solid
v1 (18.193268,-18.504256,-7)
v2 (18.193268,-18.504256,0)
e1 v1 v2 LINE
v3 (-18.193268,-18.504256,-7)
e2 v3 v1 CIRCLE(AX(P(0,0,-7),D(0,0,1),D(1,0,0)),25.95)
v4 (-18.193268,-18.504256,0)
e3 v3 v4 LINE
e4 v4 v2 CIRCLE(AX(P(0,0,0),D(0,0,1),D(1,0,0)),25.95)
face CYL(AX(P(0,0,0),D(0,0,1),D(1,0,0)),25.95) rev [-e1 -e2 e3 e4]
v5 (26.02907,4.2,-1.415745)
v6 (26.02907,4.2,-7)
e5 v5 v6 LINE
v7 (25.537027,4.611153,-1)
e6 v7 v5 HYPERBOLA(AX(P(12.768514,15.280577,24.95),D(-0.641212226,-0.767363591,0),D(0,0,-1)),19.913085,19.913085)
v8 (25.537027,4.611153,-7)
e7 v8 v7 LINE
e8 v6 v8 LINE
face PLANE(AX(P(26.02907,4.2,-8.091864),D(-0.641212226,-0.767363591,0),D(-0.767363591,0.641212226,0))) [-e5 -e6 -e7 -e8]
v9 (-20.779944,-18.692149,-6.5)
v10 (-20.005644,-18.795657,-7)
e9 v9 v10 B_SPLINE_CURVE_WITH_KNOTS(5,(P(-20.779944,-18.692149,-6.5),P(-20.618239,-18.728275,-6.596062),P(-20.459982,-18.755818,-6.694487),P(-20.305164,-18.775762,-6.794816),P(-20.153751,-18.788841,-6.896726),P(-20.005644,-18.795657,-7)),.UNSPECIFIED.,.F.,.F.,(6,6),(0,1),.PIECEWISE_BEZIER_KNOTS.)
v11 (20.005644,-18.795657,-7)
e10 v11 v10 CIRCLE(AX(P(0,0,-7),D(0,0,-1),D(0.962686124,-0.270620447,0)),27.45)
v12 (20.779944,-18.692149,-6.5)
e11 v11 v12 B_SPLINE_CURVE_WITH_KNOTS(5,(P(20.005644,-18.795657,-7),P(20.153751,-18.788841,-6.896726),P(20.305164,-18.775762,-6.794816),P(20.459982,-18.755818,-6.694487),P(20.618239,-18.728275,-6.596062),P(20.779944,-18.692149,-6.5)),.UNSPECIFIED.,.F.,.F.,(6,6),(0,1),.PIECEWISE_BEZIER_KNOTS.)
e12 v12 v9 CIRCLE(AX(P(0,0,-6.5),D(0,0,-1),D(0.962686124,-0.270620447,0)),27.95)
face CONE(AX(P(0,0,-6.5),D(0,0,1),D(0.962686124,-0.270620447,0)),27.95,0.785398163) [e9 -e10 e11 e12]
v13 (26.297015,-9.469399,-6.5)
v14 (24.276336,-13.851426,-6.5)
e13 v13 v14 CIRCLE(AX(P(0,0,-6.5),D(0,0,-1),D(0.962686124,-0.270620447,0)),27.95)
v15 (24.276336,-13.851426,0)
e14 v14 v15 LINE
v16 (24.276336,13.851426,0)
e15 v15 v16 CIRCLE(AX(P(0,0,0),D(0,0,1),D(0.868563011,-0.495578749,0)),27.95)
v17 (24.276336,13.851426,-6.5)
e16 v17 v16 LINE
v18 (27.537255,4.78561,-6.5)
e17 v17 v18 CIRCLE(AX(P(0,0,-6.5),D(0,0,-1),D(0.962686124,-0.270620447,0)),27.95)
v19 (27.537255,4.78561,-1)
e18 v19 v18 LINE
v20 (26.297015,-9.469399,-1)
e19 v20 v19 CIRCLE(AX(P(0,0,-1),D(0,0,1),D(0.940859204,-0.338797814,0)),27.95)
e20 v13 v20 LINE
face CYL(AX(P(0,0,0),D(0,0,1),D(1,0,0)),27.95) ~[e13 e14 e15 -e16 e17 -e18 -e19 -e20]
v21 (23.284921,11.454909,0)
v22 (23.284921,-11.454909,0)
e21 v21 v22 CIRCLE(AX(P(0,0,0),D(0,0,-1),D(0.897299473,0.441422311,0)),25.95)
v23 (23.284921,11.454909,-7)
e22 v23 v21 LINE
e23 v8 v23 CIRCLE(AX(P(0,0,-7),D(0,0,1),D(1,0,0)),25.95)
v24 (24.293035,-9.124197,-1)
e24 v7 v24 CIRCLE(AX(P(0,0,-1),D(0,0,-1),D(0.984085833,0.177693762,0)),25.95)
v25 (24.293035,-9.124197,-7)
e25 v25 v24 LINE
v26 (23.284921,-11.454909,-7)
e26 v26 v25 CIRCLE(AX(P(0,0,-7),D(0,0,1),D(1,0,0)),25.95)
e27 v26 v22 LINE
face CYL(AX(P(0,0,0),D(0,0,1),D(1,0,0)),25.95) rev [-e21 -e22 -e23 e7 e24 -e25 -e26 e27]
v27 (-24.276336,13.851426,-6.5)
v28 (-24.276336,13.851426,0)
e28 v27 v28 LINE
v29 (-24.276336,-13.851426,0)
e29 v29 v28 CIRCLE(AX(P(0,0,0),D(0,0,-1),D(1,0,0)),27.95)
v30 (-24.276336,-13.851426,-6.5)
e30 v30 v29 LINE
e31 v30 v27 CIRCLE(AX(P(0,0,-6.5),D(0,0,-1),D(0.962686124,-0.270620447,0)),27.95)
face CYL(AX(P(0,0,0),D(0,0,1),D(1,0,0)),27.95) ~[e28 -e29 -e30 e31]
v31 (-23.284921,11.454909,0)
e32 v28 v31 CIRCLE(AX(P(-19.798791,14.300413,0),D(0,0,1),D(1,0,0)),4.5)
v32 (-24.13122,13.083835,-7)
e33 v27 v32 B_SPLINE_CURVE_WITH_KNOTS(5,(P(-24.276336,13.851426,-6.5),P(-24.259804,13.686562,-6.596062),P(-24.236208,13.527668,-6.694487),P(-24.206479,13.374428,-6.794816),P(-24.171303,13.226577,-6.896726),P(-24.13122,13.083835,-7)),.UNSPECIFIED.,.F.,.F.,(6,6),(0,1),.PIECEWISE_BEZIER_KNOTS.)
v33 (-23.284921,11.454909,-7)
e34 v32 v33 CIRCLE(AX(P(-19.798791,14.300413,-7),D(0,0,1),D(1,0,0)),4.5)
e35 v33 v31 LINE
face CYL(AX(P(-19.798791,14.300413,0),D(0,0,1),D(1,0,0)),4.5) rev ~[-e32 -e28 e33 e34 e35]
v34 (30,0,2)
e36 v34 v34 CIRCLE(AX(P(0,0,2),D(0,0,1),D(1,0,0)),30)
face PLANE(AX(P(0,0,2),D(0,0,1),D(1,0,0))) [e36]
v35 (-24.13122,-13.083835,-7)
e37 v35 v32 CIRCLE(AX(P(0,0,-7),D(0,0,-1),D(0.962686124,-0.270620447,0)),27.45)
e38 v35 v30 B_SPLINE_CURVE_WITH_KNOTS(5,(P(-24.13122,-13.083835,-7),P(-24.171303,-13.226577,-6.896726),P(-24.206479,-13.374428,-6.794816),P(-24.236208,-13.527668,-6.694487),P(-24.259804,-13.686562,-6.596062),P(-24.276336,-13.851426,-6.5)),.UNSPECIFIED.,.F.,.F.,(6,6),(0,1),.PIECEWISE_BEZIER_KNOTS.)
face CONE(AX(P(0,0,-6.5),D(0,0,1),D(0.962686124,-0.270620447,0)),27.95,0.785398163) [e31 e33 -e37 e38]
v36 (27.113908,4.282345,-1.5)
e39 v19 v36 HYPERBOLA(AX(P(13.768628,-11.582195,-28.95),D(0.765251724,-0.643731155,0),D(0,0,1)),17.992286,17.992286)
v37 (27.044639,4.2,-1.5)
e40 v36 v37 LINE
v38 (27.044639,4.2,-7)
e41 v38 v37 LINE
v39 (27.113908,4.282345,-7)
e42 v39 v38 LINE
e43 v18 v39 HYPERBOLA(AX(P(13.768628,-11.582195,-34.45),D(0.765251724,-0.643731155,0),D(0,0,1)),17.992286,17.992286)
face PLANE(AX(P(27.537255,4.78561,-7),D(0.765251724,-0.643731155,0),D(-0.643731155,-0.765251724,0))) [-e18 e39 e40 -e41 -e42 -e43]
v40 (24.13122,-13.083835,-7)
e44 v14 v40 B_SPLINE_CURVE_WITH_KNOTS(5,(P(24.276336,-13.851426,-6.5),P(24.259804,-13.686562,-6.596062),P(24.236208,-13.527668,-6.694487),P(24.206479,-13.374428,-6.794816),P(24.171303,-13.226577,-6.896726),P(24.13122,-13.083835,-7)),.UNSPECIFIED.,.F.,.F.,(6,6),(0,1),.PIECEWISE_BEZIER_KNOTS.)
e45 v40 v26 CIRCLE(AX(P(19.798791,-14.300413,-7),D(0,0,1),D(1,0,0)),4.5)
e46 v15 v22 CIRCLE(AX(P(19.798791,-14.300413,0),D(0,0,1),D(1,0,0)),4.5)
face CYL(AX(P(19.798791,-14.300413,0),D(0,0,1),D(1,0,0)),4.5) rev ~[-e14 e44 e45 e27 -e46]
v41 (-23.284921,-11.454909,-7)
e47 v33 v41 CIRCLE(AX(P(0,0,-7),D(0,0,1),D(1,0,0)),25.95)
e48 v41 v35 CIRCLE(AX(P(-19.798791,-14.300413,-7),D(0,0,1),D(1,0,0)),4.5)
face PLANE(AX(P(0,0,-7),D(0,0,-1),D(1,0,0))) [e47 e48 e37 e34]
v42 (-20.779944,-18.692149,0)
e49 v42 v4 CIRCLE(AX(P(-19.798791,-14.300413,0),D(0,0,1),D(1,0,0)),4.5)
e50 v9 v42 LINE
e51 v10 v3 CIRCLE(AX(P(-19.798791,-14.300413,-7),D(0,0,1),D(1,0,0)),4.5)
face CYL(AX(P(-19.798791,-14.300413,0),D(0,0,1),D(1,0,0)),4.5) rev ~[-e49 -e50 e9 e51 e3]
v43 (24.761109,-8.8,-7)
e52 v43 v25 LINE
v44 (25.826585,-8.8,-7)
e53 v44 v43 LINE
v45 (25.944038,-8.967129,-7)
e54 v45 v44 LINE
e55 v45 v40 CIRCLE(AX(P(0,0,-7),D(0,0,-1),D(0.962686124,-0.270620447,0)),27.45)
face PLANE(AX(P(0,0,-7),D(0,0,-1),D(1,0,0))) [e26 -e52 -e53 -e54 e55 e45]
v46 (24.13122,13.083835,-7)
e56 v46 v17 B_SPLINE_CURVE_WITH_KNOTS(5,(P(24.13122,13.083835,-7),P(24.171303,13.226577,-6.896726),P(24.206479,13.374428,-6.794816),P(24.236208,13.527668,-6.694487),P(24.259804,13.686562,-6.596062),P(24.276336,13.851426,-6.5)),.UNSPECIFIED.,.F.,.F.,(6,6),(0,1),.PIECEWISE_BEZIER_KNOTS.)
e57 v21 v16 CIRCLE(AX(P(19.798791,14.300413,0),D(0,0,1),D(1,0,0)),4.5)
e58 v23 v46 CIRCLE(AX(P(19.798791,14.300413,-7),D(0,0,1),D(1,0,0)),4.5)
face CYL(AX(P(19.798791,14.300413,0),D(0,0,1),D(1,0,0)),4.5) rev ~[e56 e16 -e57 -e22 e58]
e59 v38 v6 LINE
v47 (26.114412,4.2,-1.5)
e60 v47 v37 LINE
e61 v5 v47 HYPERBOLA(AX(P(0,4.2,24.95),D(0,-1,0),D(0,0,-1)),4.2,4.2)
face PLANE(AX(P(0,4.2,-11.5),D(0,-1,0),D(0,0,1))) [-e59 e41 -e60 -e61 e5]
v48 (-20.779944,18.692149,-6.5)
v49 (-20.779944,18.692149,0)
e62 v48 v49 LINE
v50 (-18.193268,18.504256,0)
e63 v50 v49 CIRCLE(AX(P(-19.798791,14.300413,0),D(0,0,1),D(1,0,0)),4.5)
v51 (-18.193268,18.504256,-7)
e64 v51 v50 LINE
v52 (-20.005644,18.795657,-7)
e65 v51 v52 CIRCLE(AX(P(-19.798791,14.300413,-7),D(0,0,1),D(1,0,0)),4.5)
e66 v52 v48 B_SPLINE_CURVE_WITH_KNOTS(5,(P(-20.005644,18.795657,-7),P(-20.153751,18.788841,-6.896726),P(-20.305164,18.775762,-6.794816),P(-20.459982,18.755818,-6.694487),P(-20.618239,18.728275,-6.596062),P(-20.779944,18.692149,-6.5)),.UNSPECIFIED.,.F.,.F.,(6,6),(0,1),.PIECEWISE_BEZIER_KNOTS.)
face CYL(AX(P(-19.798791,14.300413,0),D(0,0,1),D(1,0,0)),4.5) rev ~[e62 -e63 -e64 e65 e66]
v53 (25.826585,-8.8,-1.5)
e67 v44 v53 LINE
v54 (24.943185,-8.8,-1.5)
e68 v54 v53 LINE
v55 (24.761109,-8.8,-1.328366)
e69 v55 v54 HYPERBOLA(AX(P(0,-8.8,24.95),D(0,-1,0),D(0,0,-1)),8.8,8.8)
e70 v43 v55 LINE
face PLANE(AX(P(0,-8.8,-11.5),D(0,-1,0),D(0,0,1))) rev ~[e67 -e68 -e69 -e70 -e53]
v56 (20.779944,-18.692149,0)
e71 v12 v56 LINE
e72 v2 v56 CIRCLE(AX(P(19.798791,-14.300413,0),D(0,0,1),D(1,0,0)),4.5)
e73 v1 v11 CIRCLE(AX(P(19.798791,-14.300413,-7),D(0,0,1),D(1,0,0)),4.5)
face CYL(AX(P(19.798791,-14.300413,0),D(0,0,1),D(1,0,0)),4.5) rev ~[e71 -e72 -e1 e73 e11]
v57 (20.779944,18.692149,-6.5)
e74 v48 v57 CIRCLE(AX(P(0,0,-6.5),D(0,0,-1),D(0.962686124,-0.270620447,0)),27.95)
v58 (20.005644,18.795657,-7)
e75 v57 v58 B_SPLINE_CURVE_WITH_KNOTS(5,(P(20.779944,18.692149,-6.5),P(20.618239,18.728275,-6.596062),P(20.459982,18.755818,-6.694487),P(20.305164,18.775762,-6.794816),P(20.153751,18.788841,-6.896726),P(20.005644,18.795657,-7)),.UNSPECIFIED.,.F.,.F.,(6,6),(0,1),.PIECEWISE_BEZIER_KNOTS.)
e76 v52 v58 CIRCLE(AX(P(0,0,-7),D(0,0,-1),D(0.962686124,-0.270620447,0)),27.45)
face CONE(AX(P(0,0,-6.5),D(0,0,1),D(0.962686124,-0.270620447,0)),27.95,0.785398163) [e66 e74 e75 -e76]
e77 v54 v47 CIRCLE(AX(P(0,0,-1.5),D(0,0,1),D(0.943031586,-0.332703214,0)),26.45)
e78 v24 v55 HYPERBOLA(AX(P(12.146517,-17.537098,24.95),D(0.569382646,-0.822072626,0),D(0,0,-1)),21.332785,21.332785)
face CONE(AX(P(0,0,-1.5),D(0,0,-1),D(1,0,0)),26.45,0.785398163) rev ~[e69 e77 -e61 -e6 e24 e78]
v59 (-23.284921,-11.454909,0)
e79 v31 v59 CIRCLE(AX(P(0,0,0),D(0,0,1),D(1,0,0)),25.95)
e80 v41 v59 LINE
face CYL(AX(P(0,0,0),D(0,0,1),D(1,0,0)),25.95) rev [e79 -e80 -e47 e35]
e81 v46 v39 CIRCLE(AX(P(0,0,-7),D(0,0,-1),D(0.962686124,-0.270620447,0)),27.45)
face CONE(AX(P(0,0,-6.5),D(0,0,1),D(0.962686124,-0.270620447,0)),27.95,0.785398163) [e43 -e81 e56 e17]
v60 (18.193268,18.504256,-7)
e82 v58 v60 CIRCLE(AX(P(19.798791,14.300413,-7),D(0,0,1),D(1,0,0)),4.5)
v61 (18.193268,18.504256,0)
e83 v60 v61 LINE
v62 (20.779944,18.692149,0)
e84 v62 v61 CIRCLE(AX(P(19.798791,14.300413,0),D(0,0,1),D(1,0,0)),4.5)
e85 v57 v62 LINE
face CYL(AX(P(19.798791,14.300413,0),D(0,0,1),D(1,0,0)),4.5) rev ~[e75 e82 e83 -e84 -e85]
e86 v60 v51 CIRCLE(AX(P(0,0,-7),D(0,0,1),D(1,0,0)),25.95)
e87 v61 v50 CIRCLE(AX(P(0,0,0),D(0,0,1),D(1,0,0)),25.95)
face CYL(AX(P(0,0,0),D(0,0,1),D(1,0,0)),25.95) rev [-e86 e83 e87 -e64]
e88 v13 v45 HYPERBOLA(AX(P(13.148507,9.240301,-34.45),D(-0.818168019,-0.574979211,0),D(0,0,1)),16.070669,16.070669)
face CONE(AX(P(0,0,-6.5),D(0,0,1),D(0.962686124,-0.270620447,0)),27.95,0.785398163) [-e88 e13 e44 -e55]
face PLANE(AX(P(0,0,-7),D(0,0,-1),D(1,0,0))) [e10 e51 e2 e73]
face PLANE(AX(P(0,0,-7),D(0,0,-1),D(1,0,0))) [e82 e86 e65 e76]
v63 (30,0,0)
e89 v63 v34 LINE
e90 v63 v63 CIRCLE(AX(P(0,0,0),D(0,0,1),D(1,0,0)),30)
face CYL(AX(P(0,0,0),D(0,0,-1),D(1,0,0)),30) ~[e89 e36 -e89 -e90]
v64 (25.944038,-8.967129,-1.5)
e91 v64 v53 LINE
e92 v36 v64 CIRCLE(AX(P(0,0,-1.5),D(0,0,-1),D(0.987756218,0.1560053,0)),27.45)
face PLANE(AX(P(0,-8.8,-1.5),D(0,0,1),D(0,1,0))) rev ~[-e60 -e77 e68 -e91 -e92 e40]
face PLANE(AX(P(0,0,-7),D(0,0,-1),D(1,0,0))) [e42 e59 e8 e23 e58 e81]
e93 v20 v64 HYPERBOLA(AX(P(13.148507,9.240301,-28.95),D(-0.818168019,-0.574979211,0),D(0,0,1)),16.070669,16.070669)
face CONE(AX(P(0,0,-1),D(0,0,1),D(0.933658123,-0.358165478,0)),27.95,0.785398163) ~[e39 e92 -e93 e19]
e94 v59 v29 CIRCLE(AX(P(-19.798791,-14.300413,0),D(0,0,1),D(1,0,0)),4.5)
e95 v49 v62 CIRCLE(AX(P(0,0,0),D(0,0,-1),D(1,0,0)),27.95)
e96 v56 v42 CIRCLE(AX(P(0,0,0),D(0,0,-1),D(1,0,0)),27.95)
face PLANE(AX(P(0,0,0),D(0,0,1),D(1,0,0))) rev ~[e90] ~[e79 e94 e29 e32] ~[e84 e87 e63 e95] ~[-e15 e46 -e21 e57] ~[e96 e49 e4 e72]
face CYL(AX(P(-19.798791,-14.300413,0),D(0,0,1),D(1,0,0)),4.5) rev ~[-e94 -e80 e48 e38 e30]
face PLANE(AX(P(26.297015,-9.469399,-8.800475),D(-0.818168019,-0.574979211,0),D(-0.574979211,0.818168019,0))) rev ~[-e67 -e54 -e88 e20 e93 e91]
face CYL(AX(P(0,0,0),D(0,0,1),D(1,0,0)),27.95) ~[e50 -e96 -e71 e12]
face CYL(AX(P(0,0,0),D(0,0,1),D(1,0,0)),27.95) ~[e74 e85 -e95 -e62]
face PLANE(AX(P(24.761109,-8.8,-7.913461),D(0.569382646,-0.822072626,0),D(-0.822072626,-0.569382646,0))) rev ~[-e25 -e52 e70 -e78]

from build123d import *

# Parameters (mm, degrees)
F0_R         = 30
F1_DEPTH     = 2
F2_R         = 27.95
F3_DEPTH     = 7
F4_T         = -2
F5_W         = 13
F5_H         = 10
F6_DEPTH     = 30
F7_T1_DEPTH  = 7.3004746493
F7_T3_DEPTH  = 6.5918643954
F7_T5_DEPTH  = 6.4134609486
F7_T7_DEPTH  = 7.0163816712
F7_T12_ANGLE = 11.2783830284
F7_T17_ANGLE = 20.9875744089
F7_T22_ANGLE = 22.6619870068
F7_T27_ANGLE = 12.1533364168
F7_T30_ANGLE = 338.3067764097
F7_T35_ANGLE = 11.2783830284
F7_T39_DEPTH = 7.0163816712
F7_T47_DEPTH = 7.3004746493
F7_T52_ANGLE = 20.9875744089
F7_T59_ANGLE = 22.6619870068
F7_T63_DEPTH = 6.4134609486
F7_T70_ANGLE = 12.1533364168
F7_T74_DEPTH = 6.5918643954
F8_R         = 4.5
F9_DEPTH     = 25


# Not quite as in the source:
# - a fillet or chamfer that OpenCascade refuses, or shapes differently, is made with other operations: its cross-section is extruded or revolved along the edge and cut away or added


with BuildPart() as f1:
    # F0 (on Top) → F1 (new body)
    with BuildSketch(Plane.XY):
        Circle(F0_R)
    extrude(amount=F1_DEPTH)

    # F2 (on face) → F3 (join)
    with BuildSketch(Plane(origin=(0, 0, 0), x_dir=(1, 0, 0), z_dir=(0, 0, -1))):
        Circle(F2_R)
    extrude(amount=F3_DEPTH)

    # F4
    f4_openings = [f1.faces().sort_by_distance(p)[0] for p in [
        (0, 0, -7),
    ]]
    offset(amount=F4_T, openings=f4_openings, kind=Kind.INTERSECTION)

    # F5 (on Right) → F6 (cut)
    with BuildSketch(Plane.YZ):
        with Locations((-2.3, -6.5)):
            Rectangle(F5_W, F5_H)
    extrude(amount=F6_DEPTH, mode=Mode.SUBTRACT)

    # F7: chamfer of 0.5 on 9 edges, made by hand

    # F7_s2 → F7_t1 (cut)
    with BuildSketch(Plane.XY.offset(-8.8004746493)):
        with BuildLine():
            Line((26.2970147419, -9.4693989071), (25.8265851401, -8.8))
            Line((25.8265851401, -8.8), (26.5285223863, -8.8))
            ThreePointArc((26.5285223863, -8.8), (26.4129758895, -9.1409630052), (26.2970147419, -9.4693989071))
        make_face()
    extrude(amount=F7_T1_DEPTH, mode=Mode.SUBTRACT)

    # F7_s4 → F7_t3 (cut)
    with BuildSketch(Plane.XY.offset(-8.0918643954)):
        with BuildLine():
            Line((26.0290702869, 4.2), (25.5370273703, 4.6111531191))
            ThreePointArc((25.5370273703, 4.6111531191), (25.5719745626, 4.4132320321), (25.6078601215, 4.2))
            Line((25.6078601215, 4.2), (26.0290702869, 4.2))
        make_face()
    extrude(amount=F7_T3_DEPTH, mode=Mode.SUBTRACT)

    # F7_s6 → F7_t5 (cut)
    with BuildSketch(Plane.XY.offset(-7.9134609486)):
        with BuildLine():
            Line((24.7611086182, -8.8), (24.2930347312, -9.1241965974))
            ThreePointArc((24.2930347312, -9.1241965974), (24.3504005172, -8.9699774052), (24.4123431895, -8.8))
            Line((24.4123431895, -8.8), (24.7611086182, -8.8))
        make_face()
    extrude(amount=F7_T5_DEPTH, mode=Mode.SUBTRACT)

    # F7_s8 → F7_t7 (cut)
    with BuildSketch(Plane.XY.offset(-8.5163816712)):
        with BuildLine():
            Line((27.5372554008, 4.7856102004), (27.0446390251, 4.2))
            Line((27.0446390251, 4.2), (27.6326346916, 4.2))
            ThreePointArc((27.6326346916, 4.2), (27.585450674, 4.4994900946), (27.5372554008, 4.7856102004))
        make_face()
    extrude(amount=F7_T7_DEPTH, mode=Mode.SUBTRACT)


with BuildPart() as f7_tool10:
    # F7_s11 → F7_t12 (revolve)
    with BuildSketch(Plane.XZ):
        Polygon((27.95, -1), (27.45, -1.5), (27.95, -1.5), align=None)
    revolve(axis=Axis((0, 0, -1.5), (0, 0, 1)), revolution_arc=F7_T12_ANGLE)

    split(bisect_by=Plane.XZ.offset(-4.2), keep=Keep.TOP)


with BuildPart() as f1_1:
    add(f1.part)

    # F7_t9: cut F7_tool10
    add(f7_tool10.part, mode=Mode.SUBTRACT)


with BuildPart() as f7_tool15:
    # F7_s16 → F7_t17 (revolve)
    with BuildSketch(Plane(origin=(0, 0, 0), x_dir=(0, 0, 1), z_dir=(-0.3581654779, -0.9336581229, 0))):
        Polygon((-1, -27.95), (-1.5, -27.45), (-1.5, -27.95), align=None)
    revolve(axis=Axis((0, 0, -1.5), (0, 0, 1)), revolution_arc=F7_T17_ANGLE)

    split(bisect_by=Plane.XZ.offset(8.8), keep=Keep.BOTTOM)


with BuildPart() as f1_2:
    add(f1_1.part)

    # F7_t14: cut F7_tool15
    add(f7_tool15.part, mode=Mode.SUBTRACT)


with BuildPart() as f7_tool20:
    # F7_s21 → F7_t22 (revolve)
    with BuildSketch(Plane(origin=(0, 0, 0), x_dir=(0, 0, 1), z_dir=(-0.3852938978, -0.9227939165, 0))):
        Polygon((-1.5, -26.45), (-1, -25.95), (-1.5, -25.95), align=None)
    revolve(axis=Axis((0, 0, -1.5), (0, 0, 1)), revolution_arc=F7_T22_ANGLE)

    split(bisect_by=Plane.XZ.offset(8.8), keep=Keep.BOTTOM)


with BuildPart() as f1_3:
    add(f1_2.part)

    # F7_t19: cut F7_tool20
    add(f7_tool20.part, mode=Mode.SUBTRACT)


with BuildPart() as f7_tool25:
    # F7_s26 → F7_t27 (revolve)
    with BuildSketch(Plane.XZ):
        Polygon((26.45, -1.5), (25.95, -1), (25.95, -1.5), align=None)
    revolve(axis=Axis((0, 0, -1.5), (0, 0, 1)), revolution_arc=F7_T27_ANGLE)

    split(bisect_by=Plane.XZ.offset(-4.2), keep=Keep.TOP)


with BuildPart() as f1_4:
    add(f1_3.part)

    # F7_t24: cut F7_tool25
    add(f7_tool25.part, mode=Mode.SUBTRACT)

    # F7_s29 → F7_t30 (revolve, cut)
    with BuildSketch(Plane(origin=(0, 0, 0), x_dir=(0, 0, 1), z_dir=(0.2706204465, 0.9626861243, 0))):
        Polygon((-6.5, 27.95), (-7, 27.45), (-7, 27.95), align=None)
    revolve(axis=Axis((0, 0, -7), (0, 0, -1)), revolution_arc=F7_T30_ANGLE, mode=Mode.SUBTRACT)


with BuildPart() as f7_tool33:
    # F7_s34 → F7_t35 (revolve)
    with BuildSketch(Plane.XZ):
        Polygon((27.95, -1), (27.45, -1.5), (27.95, -1.5), align=None)
    revolve(axis=Axis((0, 0, -1.5), (0, 0, 1)), revolution_arc=F7_T35_ANGLE)

    split(bisect_by=Plane.XZ.offset(-4.2), keep=Keep.BOTTOM)


with BuildPart() as f7_tool37:
    # F7_s38 → F7_t39 (new body)
    with BuildSketch(Plane.XY.offset(-7)):
        with BuildLine():
            Line((27.5372554008, 4.7856102004), (27.0446390251, 4.2))
            Line((27.0446390251, 4.2), (27.6326346916, 4.2))
            ThreePointArc((27.6326346916, 4.2), (27.585450674, 4.4994900946), (27.5372554008, 4.7856102004))
        make_face()
    extrude(amount=F7_T39_DEPTH)

    split(bisect_by=Plane.XY, keep=Keep.BOTTOM)

    split(bisect_by=Plane.XY.offset(-1.5), keep=Keep.TOP)


with BuildPart() as f7_tool33_1:
    add(f7_tool33.part)

    # F7_t42: intersect F7_tool37
    add(f7_tool37.part, mode=Mode.INTERSECT)


with BuildPart() as f1_5:
    add(f1_4.part)

    # F7_t31: cut F7_tool33
    add(f7_tool33_1.part, mode=Mode.SUBTRACT)


with BuildPart() as f7_tool45:
    # F7_s46 → F7_t47 (new body)
    with BuildSketch(Plane.XY.offset(-7)):
        with BuildLine():
            Line((26.2970147419, -9.4693989071), (25.8265851401, -8.8))
            Line((25.8265851401, -8.8), (26.5285223863, -8.8))
            ThreePointArc((26.5285223863, -8.8), (26.4129758895, -9.1409630052), (26.2970147419, -9.4693989071))
        make_face()
    extrude(amount=F7_T47_DEPTH)

    split(bisect_by=Plane.XY, keep=Keep.BOTTOM)

    split(bisect_by=Plane.XY.offset(-1.5), keep=Keep.TOP)


with BuildPart() as f7_tool50:
    # F7_s51 → F7_t52 (revolve)
    with BuildSketch(Plane(origin=(0, 0, 0), x_dir=(0, 0, 1), z_dir=(-0.3581654779, -0.9336581229, 0))):
        Polygon((-1, -27.95), (-1.5, -27.45), (-1.5, -27.95), align=None)
    revolve(axis=Axis((0, 0, -1.5), (0, 0, 1)), revolution_arc=F7_T52_ANGLE)

    split(bisect_by=Plane.XZ.offset(8.8), keep=Keep.TOP)


with BuildPart() as f7_tool45_1:
    add(f7_tool45.part)

    # F7_t54: intersect F7_tool50
    add(f7_tool50.part, mode=Mode.INTERSECT)


with BuildPart() as f1_6:
    add(f1_5.part)

    # F7_t43: cut F7_tool45
    add(f7_tool45_1.part, mode=Mode.SUBTRACT)


with BuildPart() as f7_tool57:
    # F7_s58 → F7_t59 (revolve)
    with BuildSketch(Plane(origin=(0, 0, 0), x_dir=(0, 0, 1), z_dir=(-0.3852938978, -0.9227939165, 0))):
        Polygon((-1.5, -26.45), (-1, -25.95), (-1.5, -25.95), align=None)
    revolve(axis=Axis((0, 0, -1.5), (0, 0, 1)), revolution_arc=F7_T59_ANGLE)

    split(bisect_by=Plane.XZ.offset(8.8), keep=Keep.TOP)


with BuildPart() as f7_tool61:
    # F7_s62 → F7_t63 (new body)
    with BuildSketch(Plane.XY.offset(-7)):
        with BuildLine():
            Line((24.7611086182, -8.8), (24.2930347312, -9.1241965974))
            ThreePointArc((24.2930347312, -9.1241965974), (24.3504005172, -8.9699774052), (24.4123431895, -8.8))
            Line((24.4123431895, -8.8), (24.7611086182, -8.8))
        make_face()
    extrude(amount=F7_T63_DEPTH)

    split(bisect_by=Plane.XY.offset(-1.5), keep=Keep.TOP)


with BuildPart() as f7_tool57_1:
    add(f7_tool57.part)

    # F7_t65: intersect F7_tool61
    add(f7_tool61.part, mode=Mode.INTERSECT)


with BuildPart() as f1_7:
    add(f1_6.part)

    # F7_t55: cut F7_tool57
    add(f7_tool57_1.part, mode=Mode.SUBTRACT)


with BuildPart() as f7_tool68:
    # F7_s69 → F7_t70 (revolve)
    with BuildSketch(Plane.XZ):
        Polygon((26.45, -1.5), (25.95, -1), (25.95, -1.5), align=None)
    revolve(axis=Axis((0, 0, -1.5), (0, 0, 1)), revolution_arc=F7_T70_ANGLE)

    split(bisect_by=Plane.XZ.offset(-4.2), keep=Keep.BOTTOM)


with BuildPart() as f7_tool72:
    # F7_s73 → F7_t74 (new body)
    with BuildSketch(Plane.XY.offset(-7)):
        with BuildLine():
            Line((26.0290702869, 4.2), (25.5370273703, 4.6111531191))
            ThreePointArc((25.5370273703, 4.6111531191), (25.5719745626, 4.4132320321), (25.6078601215, 4.2))
            Line((25.6078601215, 4.2), (26.0290702869, 4.2))
        make_face()
    extrude(amount=F7_T74_DEPTH)

    split(bisect_by=Plane.XY.offset(-1.5), keep=Keep.TOP)


with BuildPart() as f7_tool68_1:
    add(f7_tool68.part)

    # F7_t76: intersect F7_tool72
    add(f7_tool72.part, mode=Mode.INTERSECT)


with BuildPart() as f1_8:
    add(f1_7.part)

    # F7_t66: cut F7_tool68
    add(f7_tool68_1.part, mode=Mode.SUBTRACT)

    # F8 (on face) → F9 (cut)
    with BuildSketch(Plane.XY):
        with Locations((19.798791036, -14.3004134297)):
            Circle(F8_R)
        with Locations((-19.798791036, -14.3004134297)):
            Circle(F8_R)
        with Locations((19.798791036, 14.3004134297)):
            Circle(F8_R)
        with Locations((-19.798791036, 14.3004134297)):
            Circle(F8_R)
    extrude(amount=-F9_DEPTH, mode=Mode.SUBTRACT)


solid = f1_8.part
